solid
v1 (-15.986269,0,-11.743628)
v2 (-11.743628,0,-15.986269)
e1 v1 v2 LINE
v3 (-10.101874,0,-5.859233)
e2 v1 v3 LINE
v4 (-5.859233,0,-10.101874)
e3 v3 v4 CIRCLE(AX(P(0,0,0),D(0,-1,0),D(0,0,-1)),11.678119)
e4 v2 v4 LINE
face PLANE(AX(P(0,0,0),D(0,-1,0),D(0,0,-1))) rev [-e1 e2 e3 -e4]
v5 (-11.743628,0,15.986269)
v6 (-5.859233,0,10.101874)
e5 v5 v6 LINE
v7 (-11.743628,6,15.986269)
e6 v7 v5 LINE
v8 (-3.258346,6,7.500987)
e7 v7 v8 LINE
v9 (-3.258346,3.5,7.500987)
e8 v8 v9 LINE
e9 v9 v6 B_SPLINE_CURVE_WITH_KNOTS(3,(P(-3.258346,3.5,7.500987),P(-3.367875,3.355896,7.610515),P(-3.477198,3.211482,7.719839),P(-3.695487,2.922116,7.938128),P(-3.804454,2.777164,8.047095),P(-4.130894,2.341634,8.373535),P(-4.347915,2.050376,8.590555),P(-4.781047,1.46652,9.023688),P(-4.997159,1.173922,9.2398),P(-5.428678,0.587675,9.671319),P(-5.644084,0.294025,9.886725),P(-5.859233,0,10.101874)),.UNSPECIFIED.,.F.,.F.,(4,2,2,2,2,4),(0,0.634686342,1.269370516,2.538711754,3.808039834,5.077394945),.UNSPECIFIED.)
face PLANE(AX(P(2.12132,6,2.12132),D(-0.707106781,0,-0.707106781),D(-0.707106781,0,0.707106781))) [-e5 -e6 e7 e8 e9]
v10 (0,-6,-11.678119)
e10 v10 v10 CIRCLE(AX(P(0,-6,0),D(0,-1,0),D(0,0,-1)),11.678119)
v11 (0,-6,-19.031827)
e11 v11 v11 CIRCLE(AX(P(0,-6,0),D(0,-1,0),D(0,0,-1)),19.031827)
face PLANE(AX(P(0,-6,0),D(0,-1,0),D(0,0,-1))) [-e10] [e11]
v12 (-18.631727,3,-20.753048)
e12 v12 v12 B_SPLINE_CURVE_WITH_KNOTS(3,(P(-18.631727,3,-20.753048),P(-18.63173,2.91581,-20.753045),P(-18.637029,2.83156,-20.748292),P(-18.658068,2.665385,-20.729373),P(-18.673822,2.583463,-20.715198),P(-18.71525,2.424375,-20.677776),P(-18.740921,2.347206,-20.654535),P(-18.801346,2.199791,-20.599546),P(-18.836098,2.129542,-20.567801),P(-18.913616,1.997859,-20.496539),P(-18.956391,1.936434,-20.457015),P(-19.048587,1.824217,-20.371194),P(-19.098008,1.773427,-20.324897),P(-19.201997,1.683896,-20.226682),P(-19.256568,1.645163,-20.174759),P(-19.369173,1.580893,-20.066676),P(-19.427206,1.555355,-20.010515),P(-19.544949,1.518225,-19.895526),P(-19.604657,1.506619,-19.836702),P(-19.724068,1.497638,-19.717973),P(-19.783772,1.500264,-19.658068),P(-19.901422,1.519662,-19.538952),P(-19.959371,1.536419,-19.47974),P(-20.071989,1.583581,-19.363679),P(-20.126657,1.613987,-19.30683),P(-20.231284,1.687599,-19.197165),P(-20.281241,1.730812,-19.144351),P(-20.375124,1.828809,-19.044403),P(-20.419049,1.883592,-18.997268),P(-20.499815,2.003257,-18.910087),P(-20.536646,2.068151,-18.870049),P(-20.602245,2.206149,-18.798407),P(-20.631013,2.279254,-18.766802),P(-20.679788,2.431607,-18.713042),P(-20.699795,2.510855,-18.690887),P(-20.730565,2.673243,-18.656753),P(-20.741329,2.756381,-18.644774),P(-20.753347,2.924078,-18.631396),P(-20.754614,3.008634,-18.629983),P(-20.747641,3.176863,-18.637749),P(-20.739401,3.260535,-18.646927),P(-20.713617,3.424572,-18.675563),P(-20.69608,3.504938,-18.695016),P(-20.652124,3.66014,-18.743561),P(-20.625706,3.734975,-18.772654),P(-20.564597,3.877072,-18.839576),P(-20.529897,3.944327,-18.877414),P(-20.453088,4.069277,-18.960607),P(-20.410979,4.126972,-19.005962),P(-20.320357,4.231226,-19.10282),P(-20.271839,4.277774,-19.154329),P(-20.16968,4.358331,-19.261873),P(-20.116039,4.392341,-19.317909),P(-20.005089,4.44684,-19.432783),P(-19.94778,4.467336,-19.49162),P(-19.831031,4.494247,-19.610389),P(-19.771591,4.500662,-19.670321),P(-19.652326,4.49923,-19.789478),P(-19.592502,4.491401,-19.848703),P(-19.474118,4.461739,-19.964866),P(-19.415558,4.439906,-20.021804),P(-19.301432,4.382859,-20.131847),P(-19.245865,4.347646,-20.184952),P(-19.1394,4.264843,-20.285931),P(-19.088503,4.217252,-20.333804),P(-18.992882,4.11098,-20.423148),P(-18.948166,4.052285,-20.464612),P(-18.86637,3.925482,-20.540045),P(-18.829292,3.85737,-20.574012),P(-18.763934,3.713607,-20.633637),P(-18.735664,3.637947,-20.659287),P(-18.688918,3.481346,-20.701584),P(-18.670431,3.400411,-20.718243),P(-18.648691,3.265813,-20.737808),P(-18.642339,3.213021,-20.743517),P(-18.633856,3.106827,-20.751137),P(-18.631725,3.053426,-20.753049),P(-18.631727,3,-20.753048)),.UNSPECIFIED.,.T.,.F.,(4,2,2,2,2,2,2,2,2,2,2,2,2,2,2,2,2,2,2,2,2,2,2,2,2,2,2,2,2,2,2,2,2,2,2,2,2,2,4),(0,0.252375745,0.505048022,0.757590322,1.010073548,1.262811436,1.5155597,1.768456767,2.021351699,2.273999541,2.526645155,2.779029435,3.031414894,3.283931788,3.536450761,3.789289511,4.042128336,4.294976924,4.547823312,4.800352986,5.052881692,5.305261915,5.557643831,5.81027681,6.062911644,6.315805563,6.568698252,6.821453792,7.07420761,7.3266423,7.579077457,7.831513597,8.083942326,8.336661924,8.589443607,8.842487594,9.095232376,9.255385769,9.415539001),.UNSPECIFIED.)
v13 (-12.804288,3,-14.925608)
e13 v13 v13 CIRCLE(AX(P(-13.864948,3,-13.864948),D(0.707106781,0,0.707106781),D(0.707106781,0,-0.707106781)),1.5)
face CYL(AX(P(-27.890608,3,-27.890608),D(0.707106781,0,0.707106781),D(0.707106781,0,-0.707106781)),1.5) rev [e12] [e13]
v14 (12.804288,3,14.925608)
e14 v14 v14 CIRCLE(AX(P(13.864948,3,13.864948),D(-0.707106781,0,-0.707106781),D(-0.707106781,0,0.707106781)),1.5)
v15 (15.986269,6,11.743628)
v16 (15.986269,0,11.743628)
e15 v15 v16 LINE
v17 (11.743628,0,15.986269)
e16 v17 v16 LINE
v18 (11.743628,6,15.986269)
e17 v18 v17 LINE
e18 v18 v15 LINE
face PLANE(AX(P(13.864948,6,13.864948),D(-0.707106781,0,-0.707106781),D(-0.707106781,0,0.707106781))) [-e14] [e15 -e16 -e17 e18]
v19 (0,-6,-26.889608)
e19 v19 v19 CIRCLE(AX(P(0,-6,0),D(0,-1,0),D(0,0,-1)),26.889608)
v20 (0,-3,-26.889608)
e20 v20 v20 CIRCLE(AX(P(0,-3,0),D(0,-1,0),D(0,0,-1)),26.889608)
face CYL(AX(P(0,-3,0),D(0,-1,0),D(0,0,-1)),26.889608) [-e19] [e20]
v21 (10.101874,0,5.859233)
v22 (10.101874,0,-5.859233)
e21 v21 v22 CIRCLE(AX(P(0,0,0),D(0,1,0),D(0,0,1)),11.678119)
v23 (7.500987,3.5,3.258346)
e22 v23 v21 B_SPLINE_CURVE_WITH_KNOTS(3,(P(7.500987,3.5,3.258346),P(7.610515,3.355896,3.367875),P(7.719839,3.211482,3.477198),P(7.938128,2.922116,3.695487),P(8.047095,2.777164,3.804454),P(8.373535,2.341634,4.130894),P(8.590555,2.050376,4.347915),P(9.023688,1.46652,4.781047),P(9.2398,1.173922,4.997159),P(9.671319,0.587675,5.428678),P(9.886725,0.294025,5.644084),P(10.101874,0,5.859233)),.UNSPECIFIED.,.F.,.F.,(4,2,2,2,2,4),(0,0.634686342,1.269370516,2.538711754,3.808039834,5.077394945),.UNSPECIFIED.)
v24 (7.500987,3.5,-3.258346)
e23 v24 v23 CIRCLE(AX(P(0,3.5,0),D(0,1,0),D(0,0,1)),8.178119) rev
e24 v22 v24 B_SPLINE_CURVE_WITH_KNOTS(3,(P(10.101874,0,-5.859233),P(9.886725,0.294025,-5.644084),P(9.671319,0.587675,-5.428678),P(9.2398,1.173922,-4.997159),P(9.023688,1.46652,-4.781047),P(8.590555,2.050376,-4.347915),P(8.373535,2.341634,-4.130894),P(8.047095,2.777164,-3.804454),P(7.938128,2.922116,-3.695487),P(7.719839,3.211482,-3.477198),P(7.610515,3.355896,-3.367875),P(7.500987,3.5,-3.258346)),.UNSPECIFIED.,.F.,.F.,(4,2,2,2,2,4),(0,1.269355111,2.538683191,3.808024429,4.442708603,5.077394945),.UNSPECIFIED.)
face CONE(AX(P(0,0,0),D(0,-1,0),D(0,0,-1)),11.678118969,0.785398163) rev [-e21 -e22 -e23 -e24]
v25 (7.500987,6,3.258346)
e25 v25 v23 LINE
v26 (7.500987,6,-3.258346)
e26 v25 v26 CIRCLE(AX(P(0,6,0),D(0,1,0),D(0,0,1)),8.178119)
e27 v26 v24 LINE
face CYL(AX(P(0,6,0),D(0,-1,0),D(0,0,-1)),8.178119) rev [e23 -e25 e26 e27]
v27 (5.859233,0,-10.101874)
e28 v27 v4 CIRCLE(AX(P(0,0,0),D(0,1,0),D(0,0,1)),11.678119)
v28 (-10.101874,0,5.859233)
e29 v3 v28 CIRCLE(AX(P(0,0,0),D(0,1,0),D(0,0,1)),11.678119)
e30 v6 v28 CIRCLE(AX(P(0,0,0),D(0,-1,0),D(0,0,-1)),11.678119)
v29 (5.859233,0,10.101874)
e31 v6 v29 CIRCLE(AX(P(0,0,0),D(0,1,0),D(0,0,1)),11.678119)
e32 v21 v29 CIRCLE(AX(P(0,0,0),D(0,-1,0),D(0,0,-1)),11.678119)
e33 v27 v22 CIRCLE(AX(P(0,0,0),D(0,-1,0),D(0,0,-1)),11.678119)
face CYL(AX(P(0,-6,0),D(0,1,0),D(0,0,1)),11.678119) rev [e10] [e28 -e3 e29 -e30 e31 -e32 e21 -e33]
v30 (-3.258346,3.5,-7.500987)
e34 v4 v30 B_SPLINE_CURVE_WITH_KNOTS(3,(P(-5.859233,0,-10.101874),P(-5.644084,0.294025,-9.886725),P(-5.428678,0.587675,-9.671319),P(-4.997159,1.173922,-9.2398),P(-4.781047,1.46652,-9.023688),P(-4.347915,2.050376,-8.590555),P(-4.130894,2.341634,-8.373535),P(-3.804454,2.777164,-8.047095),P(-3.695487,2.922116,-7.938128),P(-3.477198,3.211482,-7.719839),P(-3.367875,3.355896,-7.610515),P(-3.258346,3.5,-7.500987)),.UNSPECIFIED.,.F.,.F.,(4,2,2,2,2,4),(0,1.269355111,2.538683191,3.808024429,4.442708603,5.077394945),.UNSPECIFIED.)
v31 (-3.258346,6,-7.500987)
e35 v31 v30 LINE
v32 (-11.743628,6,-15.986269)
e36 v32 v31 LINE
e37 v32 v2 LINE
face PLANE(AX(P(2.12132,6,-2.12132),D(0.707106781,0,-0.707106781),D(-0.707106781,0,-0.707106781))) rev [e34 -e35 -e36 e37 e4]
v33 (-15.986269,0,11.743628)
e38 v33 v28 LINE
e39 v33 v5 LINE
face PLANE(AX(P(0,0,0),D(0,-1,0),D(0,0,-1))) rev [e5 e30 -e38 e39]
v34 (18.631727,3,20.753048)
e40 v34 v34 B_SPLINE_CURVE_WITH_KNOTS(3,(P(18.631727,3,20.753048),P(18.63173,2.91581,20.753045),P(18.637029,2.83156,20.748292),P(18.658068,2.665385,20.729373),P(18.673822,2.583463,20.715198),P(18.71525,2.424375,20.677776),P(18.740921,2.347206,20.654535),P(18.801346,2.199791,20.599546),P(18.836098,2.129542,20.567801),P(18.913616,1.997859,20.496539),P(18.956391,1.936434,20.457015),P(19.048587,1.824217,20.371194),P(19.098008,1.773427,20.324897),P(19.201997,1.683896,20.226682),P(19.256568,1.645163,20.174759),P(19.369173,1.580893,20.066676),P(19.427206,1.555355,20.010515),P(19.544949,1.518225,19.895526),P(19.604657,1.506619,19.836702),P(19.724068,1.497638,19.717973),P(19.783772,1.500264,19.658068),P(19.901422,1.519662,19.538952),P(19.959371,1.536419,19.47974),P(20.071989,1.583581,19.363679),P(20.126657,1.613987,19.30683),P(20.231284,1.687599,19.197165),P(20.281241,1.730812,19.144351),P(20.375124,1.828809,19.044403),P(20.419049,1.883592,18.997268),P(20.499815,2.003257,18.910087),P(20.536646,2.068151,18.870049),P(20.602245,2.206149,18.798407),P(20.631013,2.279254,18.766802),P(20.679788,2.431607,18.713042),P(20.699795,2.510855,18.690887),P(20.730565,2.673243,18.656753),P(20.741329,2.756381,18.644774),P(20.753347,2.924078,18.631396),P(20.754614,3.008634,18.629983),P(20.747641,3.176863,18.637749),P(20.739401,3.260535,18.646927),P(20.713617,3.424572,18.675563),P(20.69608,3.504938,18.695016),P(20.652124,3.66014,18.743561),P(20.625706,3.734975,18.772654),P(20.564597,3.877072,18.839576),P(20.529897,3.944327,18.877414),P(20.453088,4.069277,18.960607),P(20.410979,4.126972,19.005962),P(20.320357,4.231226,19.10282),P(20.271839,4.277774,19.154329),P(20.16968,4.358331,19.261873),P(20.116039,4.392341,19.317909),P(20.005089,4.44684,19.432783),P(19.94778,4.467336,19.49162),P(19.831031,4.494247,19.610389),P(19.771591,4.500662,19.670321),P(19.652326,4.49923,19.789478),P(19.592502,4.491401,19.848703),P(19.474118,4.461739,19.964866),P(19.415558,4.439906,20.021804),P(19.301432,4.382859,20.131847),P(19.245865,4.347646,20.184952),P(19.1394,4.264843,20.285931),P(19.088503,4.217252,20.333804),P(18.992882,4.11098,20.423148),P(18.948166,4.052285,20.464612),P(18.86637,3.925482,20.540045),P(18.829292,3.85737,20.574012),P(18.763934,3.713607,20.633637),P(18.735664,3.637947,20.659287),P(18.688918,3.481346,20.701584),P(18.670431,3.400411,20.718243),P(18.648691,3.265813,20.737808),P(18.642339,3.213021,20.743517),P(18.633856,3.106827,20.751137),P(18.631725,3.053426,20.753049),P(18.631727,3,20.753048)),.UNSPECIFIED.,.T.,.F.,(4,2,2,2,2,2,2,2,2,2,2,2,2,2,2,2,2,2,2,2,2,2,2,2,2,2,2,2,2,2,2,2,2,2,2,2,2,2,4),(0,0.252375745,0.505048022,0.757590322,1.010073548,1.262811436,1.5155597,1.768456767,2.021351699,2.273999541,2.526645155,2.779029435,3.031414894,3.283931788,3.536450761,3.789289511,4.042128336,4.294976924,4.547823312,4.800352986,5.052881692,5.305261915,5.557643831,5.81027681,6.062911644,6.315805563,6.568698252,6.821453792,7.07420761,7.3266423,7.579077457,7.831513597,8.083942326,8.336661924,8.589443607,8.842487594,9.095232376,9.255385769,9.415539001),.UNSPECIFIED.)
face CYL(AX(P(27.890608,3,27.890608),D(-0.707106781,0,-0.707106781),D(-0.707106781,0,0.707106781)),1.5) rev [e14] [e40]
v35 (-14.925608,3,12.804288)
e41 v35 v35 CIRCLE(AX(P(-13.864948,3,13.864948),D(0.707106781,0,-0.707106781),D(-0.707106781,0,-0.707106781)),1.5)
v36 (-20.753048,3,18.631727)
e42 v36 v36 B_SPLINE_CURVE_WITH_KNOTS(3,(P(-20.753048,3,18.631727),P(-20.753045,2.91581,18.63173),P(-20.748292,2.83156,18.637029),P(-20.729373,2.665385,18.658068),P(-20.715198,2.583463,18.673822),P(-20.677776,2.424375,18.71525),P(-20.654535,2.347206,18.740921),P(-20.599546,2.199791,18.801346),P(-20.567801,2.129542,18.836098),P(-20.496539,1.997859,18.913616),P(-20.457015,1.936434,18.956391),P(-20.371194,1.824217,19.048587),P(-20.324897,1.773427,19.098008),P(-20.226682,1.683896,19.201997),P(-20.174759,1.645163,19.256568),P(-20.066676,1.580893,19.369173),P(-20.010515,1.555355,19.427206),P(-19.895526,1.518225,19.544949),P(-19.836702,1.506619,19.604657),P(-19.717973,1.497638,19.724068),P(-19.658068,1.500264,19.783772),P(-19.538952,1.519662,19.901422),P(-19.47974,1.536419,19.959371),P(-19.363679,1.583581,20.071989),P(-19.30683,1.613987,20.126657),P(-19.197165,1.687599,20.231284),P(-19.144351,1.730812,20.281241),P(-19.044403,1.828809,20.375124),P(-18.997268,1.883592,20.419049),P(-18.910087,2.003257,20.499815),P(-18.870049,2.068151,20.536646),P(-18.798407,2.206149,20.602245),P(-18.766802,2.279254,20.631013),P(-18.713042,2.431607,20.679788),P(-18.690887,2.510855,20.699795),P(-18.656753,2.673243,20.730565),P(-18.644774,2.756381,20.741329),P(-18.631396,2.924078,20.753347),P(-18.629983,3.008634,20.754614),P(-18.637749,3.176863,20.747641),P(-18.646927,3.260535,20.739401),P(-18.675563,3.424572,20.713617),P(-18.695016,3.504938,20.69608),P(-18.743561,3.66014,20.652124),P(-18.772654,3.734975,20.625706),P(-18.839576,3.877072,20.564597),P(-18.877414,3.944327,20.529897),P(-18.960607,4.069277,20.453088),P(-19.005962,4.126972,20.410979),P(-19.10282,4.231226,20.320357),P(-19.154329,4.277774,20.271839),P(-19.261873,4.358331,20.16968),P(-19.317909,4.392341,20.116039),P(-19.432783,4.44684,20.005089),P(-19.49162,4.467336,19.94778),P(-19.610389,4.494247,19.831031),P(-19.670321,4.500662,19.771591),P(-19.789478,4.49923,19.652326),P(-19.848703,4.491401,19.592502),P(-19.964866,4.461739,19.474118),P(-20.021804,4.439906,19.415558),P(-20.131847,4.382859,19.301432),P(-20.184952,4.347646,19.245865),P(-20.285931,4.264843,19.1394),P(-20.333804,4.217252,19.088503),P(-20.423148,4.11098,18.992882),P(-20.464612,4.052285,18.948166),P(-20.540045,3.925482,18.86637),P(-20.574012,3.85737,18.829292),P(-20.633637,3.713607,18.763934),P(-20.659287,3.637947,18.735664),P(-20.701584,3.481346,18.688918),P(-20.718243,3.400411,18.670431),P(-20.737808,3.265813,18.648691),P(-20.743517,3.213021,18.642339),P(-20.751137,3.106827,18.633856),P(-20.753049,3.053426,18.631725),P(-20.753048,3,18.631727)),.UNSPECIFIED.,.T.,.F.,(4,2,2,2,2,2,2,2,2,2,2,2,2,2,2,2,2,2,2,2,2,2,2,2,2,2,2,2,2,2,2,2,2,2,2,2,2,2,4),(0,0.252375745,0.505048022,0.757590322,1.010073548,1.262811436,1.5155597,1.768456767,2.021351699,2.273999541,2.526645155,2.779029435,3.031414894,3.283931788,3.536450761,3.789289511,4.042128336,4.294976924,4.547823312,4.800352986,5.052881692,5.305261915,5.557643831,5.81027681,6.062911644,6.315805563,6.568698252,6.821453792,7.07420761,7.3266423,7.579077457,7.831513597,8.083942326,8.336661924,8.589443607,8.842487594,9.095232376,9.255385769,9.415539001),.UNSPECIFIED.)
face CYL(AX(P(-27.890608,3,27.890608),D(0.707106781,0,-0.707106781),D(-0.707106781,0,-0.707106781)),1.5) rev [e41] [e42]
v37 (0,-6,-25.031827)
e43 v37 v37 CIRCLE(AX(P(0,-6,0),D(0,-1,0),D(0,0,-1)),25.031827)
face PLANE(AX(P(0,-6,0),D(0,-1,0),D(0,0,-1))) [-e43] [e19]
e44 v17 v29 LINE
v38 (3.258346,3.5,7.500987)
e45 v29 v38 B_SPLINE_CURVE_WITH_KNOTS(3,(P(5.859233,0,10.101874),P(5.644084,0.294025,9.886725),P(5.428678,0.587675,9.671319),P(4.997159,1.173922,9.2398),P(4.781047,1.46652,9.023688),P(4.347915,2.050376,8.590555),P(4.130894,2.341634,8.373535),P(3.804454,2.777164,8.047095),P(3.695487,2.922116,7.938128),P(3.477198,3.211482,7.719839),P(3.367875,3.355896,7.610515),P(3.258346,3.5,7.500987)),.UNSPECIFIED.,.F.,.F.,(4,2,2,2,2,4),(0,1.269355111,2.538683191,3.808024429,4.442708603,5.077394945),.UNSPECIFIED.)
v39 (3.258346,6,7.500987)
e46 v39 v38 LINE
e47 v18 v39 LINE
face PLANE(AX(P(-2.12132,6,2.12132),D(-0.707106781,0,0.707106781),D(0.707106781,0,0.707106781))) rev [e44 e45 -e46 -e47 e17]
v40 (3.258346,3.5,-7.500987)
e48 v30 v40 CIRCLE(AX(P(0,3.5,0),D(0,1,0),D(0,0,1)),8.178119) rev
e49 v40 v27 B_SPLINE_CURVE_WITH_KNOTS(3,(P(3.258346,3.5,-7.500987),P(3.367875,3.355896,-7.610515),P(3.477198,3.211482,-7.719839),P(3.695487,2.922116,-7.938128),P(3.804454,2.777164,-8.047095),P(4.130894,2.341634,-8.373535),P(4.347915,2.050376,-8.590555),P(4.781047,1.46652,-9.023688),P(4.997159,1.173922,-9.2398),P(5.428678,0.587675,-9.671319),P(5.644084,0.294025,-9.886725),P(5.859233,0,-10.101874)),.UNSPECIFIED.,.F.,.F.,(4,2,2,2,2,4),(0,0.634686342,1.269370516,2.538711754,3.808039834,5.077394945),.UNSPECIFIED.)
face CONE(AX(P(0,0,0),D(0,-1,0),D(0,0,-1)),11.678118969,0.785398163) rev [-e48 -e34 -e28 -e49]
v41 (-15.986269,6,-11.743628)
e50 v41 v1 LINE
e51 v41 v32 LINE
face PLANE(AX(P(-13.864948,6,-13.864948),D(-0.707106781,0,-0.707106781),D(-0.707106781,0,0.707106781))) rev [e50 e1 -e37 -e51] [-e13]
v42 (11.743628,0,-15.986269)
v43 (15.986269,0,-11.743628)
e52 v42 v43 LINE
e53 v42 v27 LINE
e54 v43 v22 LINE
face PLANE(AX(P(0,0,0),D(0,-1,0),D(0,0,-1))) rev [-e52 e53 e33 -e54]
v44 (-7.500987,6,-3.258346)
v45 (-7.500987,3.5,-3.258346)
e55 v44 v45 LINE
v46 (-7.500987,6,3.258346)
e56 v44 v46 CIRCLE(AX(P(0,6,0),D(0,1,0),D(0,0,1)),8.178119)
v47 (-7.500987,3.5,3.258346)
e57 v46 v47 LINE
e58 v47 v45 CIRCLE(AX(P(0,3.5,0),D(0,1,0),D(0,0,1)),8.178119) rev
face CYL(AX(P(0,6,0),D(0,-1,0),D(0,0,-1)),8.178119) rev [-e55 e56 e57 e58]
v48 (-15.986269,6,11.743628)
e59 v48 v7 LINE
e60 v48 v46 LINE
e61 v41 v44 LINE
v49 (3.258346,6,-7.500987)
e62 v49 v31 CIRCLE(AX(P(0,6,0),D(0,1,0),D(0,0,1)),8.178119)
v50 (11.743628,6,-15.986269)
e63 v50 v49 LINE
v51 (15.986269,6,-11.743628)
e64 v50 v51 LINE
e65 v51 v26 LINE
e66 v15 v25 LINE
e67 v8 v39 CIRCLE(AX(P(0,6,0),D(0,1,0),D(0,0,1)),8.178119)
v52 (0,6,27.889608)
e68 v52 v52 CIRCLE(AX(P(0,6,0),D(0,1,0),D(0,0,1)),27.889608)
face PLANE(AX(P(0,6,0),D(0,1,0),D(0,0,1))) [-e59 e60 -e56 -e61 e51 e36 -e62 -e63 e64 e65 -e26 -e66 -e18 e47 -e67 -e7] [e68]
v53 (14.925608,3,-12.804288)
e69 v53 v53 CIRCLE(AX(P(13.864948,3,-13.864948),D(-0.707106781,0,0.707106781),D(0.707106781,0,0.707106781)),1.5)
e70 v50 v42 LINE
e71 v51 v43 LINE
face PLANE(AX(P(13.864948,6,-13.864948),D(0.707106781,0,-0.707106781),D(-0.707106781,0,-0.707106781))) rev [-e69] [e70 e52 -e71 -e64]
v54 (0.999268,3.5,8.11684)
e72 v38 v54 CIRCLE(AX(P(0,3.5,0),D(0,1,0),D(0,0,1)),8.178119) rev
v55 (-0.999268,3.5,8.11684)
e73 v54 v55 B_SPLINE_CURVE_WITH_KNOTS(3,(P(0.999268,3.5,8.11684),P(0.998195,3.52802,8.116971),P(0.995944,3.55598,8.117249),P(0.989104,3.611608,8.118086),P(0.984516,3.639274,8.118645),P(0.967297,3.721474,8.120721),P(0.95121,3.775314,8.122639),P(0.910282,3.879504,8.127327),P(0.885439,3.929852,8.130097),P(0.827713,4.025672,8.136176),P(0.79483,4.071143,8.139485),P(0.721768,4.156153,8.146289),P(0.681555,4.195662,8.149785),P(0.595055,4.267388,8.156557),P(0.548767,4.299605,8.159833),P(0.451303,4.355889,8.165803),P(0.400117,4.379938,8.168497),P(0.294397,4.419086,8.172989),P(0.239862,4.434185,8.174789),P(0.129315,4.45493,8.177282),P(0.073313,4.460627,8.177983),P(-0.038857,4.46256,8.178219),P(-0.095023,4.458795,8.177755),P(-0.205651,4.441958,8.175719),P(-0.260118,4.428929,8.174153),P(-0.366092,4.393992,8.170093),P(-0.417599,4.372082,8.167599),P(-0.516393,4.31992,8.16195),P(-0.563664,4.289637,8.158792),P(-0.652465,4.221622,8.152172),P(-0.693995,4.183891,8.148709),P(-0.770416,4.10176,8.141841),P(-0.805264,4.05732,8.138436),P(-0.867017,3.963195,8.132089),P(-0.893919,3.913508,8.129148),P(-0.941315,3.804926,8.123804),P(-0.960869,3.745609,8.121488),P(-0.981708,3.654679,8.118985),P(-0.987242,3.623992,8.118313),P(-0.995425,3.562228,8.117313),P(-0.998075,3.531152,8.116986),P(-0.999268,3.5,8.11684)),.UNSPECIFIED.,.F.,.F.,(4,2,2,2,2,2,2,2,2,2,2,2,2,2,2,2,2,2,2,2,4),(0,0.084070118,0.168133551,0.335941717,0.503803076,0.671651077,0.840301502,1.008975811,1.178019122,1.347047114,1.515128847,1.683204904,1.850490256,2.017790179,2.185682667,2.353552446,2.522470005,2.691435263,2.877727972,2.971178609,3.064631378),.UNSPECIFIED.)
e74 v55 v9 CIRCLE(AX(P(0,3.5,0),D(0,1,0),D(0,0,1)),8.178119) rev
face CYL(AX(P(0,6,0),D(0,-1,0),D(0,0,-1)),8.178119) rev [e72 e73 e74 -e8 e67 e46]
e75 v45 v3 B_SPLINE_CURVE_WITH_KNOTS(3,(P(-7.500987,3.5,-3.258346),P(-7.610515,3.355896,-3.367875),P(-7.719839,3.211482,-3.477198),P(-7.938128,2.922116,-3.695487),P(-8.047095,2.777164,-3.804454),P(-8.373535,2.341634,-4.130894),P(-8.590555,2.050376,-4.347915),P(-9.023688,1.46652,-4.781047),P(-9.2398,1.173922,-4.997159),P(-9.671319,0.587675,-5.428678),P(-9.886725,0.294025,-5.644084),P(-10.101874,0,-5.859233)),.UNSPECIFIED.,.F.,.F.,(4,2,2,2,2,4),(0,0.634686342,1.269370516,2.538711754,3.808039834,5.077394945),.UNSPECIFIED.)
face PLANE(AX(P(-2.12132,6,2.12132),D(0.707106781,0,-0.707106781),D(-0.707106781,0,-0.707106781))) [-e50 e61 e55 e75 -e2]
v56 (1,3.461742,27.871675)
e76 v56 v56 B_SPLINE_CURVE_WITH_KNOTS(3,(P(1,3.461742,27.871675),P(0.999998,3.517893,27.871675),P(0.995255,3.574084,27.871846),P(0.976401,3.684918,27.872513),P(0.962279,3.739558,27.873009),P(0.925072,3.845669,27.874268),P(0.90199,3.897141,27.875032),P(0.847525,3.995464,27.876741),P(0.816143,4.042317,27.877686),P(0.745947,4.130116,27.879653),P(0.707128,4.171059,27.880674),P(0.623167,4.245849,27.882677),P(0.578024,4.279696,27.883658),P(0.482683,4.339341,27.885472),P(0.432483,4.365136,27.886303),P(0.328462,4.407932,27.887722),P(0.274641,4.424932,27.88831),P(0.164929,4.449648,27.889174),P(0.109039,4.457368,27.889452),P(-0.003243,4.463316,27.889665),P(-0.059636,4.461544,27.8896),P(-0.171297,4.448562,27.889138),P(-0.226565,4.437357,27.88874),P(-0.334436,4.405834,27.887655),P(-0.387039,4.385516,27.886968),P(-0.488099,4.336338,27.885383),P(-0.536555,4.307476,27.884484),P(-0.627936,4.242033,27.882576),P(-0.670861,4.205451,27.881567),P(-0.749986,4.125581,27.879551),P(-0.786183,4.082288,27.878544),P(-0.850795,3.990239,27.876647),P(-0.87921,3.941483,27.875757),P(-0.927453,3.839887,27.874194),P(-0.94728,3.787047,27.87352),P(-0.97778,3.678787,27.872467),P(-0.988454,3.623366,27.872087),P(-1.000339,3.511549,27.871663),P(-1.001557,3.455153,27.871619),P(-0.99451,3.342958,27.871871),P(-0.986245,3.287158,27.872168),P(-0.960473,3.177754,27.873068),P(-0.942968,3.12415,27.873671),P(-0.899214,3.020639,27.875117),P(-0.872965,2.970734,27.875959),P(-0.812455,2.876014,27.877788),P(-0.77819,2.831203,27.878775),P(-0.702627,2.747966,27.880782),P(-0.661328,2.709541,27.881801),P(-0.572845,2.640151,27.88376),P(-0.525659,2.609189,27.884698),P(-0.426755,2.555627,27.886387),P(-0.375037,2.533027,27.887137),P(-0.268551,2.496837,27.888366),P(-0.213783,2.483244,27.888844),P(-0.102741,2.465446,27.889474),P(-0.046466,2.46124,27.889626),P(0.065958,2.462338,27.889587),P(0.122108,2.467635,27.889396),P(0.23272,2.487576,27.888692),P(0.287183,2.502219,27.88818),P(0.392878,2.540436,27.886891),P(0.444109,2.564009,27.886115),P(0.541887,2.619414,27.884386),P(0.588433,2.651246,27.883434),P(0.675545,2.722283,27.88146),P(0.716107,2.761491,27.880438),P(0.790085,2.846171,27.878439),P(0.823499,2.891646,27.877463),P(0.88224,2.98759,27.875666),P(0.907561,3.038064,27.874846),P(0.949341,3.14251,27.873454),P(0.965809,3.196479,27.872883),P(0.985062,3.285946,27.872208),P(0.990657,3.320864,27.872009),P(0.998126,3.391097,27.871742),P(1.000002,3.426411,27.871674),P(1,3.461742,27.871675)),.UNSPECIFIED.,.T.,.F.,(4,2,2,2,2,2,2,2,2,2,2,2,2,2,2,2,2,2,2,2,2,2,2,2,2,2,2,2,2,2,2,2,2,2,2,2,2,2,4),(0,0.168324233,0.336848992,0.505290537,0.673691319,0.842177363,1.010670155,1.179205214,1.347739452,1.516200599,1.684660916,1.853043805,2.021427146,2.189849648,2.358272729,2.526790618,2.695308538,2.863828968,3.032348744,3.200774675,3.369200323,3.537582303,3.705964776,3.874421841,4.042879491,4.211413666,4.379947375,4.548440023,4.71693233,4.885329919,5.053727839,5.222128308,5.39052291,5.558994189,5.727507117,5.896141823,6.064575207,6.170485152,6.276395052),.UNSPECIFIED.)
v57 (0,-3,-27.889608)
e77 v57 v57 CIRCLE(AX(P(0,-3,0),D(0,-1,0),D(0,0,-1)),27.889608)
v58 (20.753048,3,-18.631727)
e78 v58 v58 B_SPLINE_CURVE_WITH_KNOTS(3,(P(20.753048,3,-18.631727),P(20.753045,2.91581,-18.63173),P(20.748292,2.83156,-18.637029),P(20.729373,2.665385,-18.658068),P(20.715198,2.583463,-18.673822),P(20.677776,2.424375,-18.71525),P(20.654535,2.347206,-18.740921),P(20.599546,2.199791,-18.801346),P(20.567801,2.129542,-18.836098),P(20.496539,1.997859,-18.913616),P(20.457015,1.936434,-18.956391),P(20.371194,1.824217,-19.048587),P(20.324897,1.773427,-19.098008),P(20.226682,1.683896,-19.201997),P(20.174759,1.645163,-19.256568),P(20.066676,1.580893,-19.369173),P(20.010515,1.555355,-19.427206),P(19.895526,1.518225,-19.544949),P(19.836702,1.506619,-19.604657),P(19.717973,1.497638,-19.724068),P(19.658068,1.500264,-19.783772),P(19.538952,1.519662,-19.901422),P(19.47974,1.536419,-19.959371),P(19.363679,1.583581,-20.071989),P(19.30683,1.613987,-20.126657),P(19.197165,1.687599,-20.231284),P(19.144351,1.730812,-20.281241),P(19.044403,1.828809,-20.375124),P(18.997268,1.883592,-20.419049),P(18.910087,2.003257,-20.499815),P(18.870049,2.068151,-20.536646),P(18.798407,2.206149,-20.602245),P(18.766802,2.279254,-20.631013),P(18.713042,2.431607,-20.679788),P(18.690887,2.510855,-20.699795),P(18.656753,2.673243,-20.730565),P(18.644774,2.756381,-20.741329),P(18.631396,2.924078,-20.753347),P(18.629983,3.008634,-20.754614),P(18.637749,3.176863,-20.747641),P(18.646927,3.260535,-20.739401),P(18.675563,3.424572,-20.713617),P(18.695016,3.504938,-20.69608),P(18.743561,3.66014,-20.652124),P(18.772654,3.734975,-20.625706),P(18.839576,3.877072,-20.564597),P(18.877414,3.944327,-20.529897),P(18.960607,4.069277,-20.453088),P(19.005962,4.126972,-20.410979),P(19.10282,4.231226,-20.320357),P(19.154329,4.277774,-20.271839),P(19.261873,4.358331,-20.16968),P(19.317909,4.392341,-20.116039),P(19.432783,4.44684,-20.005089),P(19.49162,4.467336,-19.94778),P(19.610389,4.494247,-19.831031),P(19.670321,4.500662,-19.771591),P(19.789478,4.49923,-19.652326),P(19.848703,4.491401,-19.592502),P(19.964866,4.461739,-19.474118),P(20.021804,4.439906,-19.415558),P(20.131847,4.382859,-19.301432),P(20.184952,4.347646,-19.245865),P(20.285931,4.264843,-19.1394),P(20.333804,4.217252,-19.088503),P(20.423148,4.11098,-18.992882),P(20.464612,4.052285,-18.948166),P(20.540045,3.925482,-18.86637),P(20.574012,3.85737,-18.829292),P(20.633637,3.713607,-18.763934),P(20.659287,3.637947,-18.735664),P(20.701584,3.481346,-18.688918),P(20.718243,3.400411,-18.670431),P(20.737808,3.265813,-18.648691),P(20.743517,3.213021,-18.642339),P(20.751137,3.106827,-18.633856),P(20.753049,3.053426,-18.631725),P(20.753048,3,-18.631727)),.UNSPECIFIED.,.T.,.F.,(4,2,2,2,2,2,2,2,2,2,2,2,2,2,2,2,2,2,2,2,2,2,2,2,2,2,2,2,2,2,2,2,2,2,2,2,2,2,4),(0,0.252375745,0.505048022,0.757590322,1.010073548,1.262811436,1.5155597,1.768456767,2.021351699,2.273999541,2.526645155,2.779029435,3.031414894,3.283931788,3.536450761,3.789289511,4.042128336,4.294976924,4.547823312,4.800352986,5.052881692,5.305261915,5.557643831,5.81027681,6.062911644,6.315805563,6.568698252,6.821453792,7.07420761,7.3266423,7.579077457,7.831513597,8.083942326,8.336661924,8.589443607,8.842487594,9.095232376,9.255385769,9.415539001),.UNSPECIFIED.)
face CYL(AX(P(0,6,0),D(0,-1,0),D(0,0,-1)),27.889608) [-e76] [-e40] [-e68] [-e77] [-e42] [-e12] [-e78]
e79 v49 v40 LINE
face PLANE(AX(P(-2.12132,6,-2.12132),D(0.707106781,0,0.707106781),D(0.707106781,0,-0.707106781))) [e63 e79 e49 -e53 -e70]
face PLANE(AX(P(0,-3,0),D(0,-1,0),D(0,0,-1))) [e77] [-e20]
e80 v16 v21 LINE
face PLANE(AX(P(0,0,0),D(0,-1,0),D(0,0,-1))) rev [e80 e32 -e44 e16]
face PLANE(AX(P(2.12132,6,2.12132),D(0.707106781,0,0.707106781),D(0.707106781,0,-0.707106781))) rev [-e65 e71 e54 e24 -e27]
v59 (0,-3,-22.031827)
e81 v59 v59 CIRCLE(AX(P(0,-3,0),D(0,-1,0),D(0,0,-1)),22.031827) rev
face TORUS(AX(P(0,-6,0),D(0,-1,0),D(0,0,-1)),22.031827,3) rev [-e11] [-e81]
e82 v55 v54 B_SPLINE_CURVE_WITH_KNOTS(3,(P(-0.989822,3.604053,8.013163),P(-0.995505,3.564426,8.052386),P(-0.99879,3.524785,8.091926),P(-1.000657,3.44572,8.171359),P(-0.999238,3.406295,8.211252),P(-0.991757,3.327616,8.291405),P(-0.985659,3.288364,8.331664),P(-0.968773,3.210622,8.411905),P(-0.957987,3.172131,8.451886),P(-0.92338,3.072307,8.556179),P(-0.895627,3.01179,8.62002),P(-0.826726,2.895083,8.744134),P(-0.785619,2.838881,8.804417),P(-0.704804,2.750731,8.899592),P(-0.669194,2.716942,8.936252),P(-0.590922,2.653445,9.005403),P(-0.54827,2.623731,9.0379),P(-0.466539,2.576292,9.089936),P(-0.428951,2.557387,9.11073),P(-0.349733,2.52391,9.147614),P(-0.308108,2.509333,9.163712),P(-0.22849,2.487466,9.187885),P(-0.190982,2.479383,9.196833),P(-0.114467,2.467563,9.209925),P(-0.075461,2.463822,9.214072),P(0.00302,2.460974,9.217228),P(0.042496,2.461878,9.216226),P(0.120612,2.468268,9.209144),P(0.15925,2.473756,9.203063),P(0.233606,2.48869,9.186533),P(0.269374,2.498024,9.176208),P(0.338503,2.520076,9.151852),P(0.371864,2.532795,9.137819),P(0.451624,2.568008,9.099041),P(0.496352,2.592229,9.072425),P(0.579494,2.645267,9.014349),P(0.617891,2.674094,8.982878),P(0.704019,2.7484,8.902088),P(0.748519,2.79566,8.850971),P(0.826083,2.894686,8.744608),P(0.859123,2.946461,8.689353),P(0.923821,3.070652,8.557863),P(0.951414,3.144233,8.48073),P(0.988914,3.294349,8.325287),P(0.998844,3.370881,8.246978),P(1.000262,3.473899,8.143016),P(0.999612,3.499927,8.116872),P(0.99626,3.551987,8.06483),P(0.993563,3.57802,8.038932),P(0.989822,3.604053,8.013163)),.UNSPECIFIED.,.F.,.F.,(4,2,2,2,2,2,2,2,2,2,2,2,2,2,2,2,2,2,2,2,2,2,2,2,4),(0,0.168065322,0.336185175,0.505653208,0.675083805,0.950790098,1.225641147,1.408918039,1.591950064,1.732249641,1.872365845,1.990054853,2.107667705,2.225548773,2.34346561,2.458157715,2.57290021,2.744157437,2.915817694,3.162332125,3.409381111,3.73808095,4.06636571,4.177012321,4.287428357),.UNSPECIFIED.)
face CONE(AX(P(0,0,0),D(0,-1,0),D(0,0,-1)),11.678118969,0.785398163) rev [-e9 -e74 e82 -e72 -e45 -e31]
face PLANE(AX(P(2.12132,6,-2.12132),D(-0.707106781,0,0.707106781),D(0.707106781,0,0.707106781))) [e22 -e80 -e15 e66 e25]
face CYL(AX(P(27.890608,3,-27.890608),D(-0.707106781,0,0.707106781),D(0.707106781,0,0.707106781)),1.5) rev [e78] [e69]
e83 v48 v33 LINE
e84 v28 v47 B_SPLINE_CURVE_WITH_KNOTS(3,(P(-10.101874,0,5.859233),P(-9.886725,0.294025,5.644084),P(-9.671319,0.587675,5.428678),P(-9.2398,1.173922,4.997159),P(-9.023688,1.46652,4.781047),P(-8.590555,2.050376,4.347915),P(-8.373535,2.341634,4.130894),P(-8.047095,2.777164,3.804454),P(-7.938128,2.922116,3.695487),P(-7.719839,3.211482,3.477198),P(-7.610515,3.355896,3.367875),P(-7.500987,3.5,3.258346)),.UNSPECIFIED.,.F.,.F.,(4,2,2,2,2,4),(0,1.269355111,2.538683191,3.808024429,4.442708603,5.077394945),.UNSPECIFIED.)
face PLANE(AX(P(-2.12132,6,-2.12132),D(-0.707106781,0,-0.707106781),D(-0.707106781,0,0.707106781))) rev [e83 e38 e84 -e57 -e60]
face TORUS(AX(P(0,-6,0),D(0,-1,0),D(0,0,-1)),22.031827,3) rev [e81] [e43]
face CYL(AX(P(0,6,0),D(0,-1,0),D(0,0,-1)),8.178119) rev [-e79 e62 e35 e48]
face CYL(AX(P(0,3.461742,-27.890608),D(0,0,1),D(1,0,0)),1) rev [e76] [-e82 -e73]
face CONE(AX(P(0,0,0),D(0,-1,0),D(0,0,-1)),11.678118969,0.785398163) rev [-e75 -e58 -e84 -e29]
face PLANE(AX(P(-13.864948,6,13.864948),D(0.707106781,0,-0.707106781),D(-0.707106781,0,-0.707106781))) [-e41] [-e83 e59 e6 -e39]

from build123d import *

# Parameters (mm, degrees)
SKETCH1_R               = 27.889608224
BOSS_EXTRUDE1_DEPTH     = 6
CUT_EXTRUDE1_REACH      = 61.354
CUT_EXTRUDE1_END_RADIUS = 27.889608224
SKETCH2_R               = 1.5
CIRPATTERN1_COUNT       = 4
CHAMFER1_SIZE           = 3.5
BOSS_EXTRUDE2_START     = 6
SKETCH3_R               = 27.889608224
SKETCH3_R_2             = 11.678118969
BOSS_EXTRUDE2_DEPTH     = 6
CUT_EXTRUDE2_REACH      = 64.651
SKETCH4_R               = 1
SKETCH5_R               = 27.889608224
SKETCH5_R_2             = 26.889608224
SKETCH5_R_3             = 25.031826588
SKETCH5_R_4             = 19.031826588
CUT_EXTRUDE3_DEPTH      = 3
FILLET1_R               = 3


with BuildPart() as part:
    # Sketch1 → Boss-Extrude1 (new body)
    with BuildSketch(Plane(origin=(0, 0, 0), x_dir=(1, 0, 0), z_dir=(0, 1, 0))):
        with Locations(Location((0, 0, 0), (0, 0, 270))):
            Circle(SKETCH1_R)
        with BuildLine():
            ThreePointArc((-7.500987149, 3.258346461), (-8.178118969, 0), (-7.500987149, -3.258346461))
            Line((-7.500987149, -3.258346461), (-15.986268523, -11.743627836))
            Line((-15.986268523, -11.743627836), (-11.743627836, -15.986268523))
            Line((-11.743627836, -15.986268523), (-3.258346461, -7.500987149))
            ThreePointArc((-3.258346461, -7.500987149), (0, -8.178118969), (3.258346461, -7.500987149))
            Line((3.258346461, -7.500987149), (11.743627836, -15.986268523))
            Line((11.743627836, -15.986268523), (15.986268523, -11.743627836))
            Line((15.986268523, -11.743627836), (7.500987149, -3.258346461))
            ThreePointArc((7.500987149, -3.258346461), (8.178118969, 0), (7.500987149, 3.258346461))
            Line((7.500987149, 3.258346461), (15.986268523, 11.743627836))
            Line((15.986268523, 11.743627836), (11.743627836, 15.986268523))
            Line((11.743627836, 15.986268523), (3.258346461, 7.500987149))
            ThreePointArc((3.258346461, 7.500987149), (0, 8.178118969), (-3.258346461, 7.500987149))
            Line((-3.258346461, 7.500987149), (-11.743627836, 15.986268523))
            Line((-11.743627836, 15.986268523), (-15.986268523, 11.743627836))
            Line((-15.986268523, 11.743627836), (-7.500987149, 3.258346461))
        make_face(mode=Mode.SUBTRACT)
    extrude(amount=BOSS_EXTRUDE1_DEPTH)

    # Cut-Extrude1: up to this cylinder (the profile starts inside it)
    cut_extrude1_end = Plane(origin=(0, 3, 0), z_dir=(0, -1, 0)) * Cylinder(CUT_EXTRUDE1_END_RADIUS, 179.487216449, mode=Mode.PRIVATE)
    # Sketch2 → Cut-Extrude1 (cut, up to the surface)
    with BuildSketch(Plane(origin=(13.864948179, 0, -13.864948179), x_dir=(0.7071067811865458, 0, 0.7071067811865492), z_dir=(-0.7071067811865492, 0, 0.7071067811865458)), mode=Mode.PRIVATE) as cut_extrude1_sk1:
        with Locations((0, 3)):
            Circle(SKETCH2_R)
    cut_extrude1_tool1 = extrude(cut_extrude1_sk1.sketch, amount=-CUT_EXTRUDE1_REACH, mode=Mode.PRIVATE) & cut_extrude1_end
    cut_extrude1 = cut_extrude1_tool1.solids().sort_by_distance((13.864948, 3, -13.864948))[0]
    add(cut_extrude1, mode=Mode.SUBTRACT)

    # CirPattern1: Cut-Extrude1 ×4 about axis
    cirpattern1_axis = Axis((0, 6, 0), (0, -1, 0))
    for i in range(1, CIRPATTERN1_COUNT):
        add(cut_extrude1.rotate(cirpattern1_axis, i * 360 / CIRPATTERN1_COUNT), mode=Mode.SUBTRACT)

    # Chamfer1
    chamfer1_edges = [part.edges().sort_by_distance(p)[0] for p in [
        (0, 0, 8.178118969),
        (8.178118969, 0, 0),
        (0, 0, -8.178118969),
        (-8.178118969, 0, 0),
    ]]
    chamfer(chamfer1_edges, length=CHAMFER1_SIZE)

    # Sketch3 → Boss-Extrude2 (add)
    with BuildSketch(Plane.XZ.offset(BOSS_EXTRUDE2_START)):
        with Locations(Location((0, 0, 0), (0, 0, 270))):
            Circle(SKETCH3_R)
        with Locations(Location((0, 0, 0), (0, 0, 59.885646145))):
            Circle(SKETCH3_R_2, mode=Mode.SUBTRACT)
    extrude(amount=-BOSS_EXTRUDE2_DEPTH)

    # Sketch4 → Cut-Extrude2 (cut, up to next)
    with BuildSketch(Plane.XY.offset(27.889608224), mode=Mode.PRIVATE) as cut_extrude2_sk1:
        with Locations((0, 3.461741733)):
            Circle(SKETCH4_R)
    cut_extrude2_tool1 = extrude(cut_extrude2_sk1.sketch, amount=-CUT_EXTRUDE2_REACH, mode=Mode.PRIVATE) & part.part
    add(cut_extrude2_tool1.solids().sort_by_distance((0, 3.461742, 27.889608))[0], mode=Mode.SUBTRACT)

    # Sketch5 → Cut-Extrude3 (cut)
    # profile 1 of 2: a face of its own
    with BuildSketch(Plane.XZ.offset(6)):
        with Locations(Location((0, 0, 0), (0, 0, 270))):
            Circle(SKETCH5_R)
        with Locations(Location((0, 0, 0), (0, 0, 270))):
            Circle(SKETCH5_R_2, mode=Mode.SUBTRACT)
    # profile 2 of 2: a face of its own
    with BuildSketch(Plane.XZ.offset(6)):
        with Locations(Location((0, 0, 0), (0, 0, 270))):
            Circle(SKETCH5_R_3)
        with Locations(Location((0, 0, 0), (0, 0, 270))):
            Circle(SKETCH5_R_4, mode=Mode.SUBTRACT)
    extrude(amount=-CUT_EXTRUDE3_DEPTH, mode=Mode.SUBTRACT)

    # Fillet1
    fillet1_edges = [part.edges().sort_by_distance(p)[0] for p in [
        (0, -3, 25.031826588),
        (0, -3, 19.031826588),
    ]]
    fillet(fillet1_edges, radius=FILLET1_R - 0.0001)  # a hair under: the kernel refuses the full size


solid = part.part
